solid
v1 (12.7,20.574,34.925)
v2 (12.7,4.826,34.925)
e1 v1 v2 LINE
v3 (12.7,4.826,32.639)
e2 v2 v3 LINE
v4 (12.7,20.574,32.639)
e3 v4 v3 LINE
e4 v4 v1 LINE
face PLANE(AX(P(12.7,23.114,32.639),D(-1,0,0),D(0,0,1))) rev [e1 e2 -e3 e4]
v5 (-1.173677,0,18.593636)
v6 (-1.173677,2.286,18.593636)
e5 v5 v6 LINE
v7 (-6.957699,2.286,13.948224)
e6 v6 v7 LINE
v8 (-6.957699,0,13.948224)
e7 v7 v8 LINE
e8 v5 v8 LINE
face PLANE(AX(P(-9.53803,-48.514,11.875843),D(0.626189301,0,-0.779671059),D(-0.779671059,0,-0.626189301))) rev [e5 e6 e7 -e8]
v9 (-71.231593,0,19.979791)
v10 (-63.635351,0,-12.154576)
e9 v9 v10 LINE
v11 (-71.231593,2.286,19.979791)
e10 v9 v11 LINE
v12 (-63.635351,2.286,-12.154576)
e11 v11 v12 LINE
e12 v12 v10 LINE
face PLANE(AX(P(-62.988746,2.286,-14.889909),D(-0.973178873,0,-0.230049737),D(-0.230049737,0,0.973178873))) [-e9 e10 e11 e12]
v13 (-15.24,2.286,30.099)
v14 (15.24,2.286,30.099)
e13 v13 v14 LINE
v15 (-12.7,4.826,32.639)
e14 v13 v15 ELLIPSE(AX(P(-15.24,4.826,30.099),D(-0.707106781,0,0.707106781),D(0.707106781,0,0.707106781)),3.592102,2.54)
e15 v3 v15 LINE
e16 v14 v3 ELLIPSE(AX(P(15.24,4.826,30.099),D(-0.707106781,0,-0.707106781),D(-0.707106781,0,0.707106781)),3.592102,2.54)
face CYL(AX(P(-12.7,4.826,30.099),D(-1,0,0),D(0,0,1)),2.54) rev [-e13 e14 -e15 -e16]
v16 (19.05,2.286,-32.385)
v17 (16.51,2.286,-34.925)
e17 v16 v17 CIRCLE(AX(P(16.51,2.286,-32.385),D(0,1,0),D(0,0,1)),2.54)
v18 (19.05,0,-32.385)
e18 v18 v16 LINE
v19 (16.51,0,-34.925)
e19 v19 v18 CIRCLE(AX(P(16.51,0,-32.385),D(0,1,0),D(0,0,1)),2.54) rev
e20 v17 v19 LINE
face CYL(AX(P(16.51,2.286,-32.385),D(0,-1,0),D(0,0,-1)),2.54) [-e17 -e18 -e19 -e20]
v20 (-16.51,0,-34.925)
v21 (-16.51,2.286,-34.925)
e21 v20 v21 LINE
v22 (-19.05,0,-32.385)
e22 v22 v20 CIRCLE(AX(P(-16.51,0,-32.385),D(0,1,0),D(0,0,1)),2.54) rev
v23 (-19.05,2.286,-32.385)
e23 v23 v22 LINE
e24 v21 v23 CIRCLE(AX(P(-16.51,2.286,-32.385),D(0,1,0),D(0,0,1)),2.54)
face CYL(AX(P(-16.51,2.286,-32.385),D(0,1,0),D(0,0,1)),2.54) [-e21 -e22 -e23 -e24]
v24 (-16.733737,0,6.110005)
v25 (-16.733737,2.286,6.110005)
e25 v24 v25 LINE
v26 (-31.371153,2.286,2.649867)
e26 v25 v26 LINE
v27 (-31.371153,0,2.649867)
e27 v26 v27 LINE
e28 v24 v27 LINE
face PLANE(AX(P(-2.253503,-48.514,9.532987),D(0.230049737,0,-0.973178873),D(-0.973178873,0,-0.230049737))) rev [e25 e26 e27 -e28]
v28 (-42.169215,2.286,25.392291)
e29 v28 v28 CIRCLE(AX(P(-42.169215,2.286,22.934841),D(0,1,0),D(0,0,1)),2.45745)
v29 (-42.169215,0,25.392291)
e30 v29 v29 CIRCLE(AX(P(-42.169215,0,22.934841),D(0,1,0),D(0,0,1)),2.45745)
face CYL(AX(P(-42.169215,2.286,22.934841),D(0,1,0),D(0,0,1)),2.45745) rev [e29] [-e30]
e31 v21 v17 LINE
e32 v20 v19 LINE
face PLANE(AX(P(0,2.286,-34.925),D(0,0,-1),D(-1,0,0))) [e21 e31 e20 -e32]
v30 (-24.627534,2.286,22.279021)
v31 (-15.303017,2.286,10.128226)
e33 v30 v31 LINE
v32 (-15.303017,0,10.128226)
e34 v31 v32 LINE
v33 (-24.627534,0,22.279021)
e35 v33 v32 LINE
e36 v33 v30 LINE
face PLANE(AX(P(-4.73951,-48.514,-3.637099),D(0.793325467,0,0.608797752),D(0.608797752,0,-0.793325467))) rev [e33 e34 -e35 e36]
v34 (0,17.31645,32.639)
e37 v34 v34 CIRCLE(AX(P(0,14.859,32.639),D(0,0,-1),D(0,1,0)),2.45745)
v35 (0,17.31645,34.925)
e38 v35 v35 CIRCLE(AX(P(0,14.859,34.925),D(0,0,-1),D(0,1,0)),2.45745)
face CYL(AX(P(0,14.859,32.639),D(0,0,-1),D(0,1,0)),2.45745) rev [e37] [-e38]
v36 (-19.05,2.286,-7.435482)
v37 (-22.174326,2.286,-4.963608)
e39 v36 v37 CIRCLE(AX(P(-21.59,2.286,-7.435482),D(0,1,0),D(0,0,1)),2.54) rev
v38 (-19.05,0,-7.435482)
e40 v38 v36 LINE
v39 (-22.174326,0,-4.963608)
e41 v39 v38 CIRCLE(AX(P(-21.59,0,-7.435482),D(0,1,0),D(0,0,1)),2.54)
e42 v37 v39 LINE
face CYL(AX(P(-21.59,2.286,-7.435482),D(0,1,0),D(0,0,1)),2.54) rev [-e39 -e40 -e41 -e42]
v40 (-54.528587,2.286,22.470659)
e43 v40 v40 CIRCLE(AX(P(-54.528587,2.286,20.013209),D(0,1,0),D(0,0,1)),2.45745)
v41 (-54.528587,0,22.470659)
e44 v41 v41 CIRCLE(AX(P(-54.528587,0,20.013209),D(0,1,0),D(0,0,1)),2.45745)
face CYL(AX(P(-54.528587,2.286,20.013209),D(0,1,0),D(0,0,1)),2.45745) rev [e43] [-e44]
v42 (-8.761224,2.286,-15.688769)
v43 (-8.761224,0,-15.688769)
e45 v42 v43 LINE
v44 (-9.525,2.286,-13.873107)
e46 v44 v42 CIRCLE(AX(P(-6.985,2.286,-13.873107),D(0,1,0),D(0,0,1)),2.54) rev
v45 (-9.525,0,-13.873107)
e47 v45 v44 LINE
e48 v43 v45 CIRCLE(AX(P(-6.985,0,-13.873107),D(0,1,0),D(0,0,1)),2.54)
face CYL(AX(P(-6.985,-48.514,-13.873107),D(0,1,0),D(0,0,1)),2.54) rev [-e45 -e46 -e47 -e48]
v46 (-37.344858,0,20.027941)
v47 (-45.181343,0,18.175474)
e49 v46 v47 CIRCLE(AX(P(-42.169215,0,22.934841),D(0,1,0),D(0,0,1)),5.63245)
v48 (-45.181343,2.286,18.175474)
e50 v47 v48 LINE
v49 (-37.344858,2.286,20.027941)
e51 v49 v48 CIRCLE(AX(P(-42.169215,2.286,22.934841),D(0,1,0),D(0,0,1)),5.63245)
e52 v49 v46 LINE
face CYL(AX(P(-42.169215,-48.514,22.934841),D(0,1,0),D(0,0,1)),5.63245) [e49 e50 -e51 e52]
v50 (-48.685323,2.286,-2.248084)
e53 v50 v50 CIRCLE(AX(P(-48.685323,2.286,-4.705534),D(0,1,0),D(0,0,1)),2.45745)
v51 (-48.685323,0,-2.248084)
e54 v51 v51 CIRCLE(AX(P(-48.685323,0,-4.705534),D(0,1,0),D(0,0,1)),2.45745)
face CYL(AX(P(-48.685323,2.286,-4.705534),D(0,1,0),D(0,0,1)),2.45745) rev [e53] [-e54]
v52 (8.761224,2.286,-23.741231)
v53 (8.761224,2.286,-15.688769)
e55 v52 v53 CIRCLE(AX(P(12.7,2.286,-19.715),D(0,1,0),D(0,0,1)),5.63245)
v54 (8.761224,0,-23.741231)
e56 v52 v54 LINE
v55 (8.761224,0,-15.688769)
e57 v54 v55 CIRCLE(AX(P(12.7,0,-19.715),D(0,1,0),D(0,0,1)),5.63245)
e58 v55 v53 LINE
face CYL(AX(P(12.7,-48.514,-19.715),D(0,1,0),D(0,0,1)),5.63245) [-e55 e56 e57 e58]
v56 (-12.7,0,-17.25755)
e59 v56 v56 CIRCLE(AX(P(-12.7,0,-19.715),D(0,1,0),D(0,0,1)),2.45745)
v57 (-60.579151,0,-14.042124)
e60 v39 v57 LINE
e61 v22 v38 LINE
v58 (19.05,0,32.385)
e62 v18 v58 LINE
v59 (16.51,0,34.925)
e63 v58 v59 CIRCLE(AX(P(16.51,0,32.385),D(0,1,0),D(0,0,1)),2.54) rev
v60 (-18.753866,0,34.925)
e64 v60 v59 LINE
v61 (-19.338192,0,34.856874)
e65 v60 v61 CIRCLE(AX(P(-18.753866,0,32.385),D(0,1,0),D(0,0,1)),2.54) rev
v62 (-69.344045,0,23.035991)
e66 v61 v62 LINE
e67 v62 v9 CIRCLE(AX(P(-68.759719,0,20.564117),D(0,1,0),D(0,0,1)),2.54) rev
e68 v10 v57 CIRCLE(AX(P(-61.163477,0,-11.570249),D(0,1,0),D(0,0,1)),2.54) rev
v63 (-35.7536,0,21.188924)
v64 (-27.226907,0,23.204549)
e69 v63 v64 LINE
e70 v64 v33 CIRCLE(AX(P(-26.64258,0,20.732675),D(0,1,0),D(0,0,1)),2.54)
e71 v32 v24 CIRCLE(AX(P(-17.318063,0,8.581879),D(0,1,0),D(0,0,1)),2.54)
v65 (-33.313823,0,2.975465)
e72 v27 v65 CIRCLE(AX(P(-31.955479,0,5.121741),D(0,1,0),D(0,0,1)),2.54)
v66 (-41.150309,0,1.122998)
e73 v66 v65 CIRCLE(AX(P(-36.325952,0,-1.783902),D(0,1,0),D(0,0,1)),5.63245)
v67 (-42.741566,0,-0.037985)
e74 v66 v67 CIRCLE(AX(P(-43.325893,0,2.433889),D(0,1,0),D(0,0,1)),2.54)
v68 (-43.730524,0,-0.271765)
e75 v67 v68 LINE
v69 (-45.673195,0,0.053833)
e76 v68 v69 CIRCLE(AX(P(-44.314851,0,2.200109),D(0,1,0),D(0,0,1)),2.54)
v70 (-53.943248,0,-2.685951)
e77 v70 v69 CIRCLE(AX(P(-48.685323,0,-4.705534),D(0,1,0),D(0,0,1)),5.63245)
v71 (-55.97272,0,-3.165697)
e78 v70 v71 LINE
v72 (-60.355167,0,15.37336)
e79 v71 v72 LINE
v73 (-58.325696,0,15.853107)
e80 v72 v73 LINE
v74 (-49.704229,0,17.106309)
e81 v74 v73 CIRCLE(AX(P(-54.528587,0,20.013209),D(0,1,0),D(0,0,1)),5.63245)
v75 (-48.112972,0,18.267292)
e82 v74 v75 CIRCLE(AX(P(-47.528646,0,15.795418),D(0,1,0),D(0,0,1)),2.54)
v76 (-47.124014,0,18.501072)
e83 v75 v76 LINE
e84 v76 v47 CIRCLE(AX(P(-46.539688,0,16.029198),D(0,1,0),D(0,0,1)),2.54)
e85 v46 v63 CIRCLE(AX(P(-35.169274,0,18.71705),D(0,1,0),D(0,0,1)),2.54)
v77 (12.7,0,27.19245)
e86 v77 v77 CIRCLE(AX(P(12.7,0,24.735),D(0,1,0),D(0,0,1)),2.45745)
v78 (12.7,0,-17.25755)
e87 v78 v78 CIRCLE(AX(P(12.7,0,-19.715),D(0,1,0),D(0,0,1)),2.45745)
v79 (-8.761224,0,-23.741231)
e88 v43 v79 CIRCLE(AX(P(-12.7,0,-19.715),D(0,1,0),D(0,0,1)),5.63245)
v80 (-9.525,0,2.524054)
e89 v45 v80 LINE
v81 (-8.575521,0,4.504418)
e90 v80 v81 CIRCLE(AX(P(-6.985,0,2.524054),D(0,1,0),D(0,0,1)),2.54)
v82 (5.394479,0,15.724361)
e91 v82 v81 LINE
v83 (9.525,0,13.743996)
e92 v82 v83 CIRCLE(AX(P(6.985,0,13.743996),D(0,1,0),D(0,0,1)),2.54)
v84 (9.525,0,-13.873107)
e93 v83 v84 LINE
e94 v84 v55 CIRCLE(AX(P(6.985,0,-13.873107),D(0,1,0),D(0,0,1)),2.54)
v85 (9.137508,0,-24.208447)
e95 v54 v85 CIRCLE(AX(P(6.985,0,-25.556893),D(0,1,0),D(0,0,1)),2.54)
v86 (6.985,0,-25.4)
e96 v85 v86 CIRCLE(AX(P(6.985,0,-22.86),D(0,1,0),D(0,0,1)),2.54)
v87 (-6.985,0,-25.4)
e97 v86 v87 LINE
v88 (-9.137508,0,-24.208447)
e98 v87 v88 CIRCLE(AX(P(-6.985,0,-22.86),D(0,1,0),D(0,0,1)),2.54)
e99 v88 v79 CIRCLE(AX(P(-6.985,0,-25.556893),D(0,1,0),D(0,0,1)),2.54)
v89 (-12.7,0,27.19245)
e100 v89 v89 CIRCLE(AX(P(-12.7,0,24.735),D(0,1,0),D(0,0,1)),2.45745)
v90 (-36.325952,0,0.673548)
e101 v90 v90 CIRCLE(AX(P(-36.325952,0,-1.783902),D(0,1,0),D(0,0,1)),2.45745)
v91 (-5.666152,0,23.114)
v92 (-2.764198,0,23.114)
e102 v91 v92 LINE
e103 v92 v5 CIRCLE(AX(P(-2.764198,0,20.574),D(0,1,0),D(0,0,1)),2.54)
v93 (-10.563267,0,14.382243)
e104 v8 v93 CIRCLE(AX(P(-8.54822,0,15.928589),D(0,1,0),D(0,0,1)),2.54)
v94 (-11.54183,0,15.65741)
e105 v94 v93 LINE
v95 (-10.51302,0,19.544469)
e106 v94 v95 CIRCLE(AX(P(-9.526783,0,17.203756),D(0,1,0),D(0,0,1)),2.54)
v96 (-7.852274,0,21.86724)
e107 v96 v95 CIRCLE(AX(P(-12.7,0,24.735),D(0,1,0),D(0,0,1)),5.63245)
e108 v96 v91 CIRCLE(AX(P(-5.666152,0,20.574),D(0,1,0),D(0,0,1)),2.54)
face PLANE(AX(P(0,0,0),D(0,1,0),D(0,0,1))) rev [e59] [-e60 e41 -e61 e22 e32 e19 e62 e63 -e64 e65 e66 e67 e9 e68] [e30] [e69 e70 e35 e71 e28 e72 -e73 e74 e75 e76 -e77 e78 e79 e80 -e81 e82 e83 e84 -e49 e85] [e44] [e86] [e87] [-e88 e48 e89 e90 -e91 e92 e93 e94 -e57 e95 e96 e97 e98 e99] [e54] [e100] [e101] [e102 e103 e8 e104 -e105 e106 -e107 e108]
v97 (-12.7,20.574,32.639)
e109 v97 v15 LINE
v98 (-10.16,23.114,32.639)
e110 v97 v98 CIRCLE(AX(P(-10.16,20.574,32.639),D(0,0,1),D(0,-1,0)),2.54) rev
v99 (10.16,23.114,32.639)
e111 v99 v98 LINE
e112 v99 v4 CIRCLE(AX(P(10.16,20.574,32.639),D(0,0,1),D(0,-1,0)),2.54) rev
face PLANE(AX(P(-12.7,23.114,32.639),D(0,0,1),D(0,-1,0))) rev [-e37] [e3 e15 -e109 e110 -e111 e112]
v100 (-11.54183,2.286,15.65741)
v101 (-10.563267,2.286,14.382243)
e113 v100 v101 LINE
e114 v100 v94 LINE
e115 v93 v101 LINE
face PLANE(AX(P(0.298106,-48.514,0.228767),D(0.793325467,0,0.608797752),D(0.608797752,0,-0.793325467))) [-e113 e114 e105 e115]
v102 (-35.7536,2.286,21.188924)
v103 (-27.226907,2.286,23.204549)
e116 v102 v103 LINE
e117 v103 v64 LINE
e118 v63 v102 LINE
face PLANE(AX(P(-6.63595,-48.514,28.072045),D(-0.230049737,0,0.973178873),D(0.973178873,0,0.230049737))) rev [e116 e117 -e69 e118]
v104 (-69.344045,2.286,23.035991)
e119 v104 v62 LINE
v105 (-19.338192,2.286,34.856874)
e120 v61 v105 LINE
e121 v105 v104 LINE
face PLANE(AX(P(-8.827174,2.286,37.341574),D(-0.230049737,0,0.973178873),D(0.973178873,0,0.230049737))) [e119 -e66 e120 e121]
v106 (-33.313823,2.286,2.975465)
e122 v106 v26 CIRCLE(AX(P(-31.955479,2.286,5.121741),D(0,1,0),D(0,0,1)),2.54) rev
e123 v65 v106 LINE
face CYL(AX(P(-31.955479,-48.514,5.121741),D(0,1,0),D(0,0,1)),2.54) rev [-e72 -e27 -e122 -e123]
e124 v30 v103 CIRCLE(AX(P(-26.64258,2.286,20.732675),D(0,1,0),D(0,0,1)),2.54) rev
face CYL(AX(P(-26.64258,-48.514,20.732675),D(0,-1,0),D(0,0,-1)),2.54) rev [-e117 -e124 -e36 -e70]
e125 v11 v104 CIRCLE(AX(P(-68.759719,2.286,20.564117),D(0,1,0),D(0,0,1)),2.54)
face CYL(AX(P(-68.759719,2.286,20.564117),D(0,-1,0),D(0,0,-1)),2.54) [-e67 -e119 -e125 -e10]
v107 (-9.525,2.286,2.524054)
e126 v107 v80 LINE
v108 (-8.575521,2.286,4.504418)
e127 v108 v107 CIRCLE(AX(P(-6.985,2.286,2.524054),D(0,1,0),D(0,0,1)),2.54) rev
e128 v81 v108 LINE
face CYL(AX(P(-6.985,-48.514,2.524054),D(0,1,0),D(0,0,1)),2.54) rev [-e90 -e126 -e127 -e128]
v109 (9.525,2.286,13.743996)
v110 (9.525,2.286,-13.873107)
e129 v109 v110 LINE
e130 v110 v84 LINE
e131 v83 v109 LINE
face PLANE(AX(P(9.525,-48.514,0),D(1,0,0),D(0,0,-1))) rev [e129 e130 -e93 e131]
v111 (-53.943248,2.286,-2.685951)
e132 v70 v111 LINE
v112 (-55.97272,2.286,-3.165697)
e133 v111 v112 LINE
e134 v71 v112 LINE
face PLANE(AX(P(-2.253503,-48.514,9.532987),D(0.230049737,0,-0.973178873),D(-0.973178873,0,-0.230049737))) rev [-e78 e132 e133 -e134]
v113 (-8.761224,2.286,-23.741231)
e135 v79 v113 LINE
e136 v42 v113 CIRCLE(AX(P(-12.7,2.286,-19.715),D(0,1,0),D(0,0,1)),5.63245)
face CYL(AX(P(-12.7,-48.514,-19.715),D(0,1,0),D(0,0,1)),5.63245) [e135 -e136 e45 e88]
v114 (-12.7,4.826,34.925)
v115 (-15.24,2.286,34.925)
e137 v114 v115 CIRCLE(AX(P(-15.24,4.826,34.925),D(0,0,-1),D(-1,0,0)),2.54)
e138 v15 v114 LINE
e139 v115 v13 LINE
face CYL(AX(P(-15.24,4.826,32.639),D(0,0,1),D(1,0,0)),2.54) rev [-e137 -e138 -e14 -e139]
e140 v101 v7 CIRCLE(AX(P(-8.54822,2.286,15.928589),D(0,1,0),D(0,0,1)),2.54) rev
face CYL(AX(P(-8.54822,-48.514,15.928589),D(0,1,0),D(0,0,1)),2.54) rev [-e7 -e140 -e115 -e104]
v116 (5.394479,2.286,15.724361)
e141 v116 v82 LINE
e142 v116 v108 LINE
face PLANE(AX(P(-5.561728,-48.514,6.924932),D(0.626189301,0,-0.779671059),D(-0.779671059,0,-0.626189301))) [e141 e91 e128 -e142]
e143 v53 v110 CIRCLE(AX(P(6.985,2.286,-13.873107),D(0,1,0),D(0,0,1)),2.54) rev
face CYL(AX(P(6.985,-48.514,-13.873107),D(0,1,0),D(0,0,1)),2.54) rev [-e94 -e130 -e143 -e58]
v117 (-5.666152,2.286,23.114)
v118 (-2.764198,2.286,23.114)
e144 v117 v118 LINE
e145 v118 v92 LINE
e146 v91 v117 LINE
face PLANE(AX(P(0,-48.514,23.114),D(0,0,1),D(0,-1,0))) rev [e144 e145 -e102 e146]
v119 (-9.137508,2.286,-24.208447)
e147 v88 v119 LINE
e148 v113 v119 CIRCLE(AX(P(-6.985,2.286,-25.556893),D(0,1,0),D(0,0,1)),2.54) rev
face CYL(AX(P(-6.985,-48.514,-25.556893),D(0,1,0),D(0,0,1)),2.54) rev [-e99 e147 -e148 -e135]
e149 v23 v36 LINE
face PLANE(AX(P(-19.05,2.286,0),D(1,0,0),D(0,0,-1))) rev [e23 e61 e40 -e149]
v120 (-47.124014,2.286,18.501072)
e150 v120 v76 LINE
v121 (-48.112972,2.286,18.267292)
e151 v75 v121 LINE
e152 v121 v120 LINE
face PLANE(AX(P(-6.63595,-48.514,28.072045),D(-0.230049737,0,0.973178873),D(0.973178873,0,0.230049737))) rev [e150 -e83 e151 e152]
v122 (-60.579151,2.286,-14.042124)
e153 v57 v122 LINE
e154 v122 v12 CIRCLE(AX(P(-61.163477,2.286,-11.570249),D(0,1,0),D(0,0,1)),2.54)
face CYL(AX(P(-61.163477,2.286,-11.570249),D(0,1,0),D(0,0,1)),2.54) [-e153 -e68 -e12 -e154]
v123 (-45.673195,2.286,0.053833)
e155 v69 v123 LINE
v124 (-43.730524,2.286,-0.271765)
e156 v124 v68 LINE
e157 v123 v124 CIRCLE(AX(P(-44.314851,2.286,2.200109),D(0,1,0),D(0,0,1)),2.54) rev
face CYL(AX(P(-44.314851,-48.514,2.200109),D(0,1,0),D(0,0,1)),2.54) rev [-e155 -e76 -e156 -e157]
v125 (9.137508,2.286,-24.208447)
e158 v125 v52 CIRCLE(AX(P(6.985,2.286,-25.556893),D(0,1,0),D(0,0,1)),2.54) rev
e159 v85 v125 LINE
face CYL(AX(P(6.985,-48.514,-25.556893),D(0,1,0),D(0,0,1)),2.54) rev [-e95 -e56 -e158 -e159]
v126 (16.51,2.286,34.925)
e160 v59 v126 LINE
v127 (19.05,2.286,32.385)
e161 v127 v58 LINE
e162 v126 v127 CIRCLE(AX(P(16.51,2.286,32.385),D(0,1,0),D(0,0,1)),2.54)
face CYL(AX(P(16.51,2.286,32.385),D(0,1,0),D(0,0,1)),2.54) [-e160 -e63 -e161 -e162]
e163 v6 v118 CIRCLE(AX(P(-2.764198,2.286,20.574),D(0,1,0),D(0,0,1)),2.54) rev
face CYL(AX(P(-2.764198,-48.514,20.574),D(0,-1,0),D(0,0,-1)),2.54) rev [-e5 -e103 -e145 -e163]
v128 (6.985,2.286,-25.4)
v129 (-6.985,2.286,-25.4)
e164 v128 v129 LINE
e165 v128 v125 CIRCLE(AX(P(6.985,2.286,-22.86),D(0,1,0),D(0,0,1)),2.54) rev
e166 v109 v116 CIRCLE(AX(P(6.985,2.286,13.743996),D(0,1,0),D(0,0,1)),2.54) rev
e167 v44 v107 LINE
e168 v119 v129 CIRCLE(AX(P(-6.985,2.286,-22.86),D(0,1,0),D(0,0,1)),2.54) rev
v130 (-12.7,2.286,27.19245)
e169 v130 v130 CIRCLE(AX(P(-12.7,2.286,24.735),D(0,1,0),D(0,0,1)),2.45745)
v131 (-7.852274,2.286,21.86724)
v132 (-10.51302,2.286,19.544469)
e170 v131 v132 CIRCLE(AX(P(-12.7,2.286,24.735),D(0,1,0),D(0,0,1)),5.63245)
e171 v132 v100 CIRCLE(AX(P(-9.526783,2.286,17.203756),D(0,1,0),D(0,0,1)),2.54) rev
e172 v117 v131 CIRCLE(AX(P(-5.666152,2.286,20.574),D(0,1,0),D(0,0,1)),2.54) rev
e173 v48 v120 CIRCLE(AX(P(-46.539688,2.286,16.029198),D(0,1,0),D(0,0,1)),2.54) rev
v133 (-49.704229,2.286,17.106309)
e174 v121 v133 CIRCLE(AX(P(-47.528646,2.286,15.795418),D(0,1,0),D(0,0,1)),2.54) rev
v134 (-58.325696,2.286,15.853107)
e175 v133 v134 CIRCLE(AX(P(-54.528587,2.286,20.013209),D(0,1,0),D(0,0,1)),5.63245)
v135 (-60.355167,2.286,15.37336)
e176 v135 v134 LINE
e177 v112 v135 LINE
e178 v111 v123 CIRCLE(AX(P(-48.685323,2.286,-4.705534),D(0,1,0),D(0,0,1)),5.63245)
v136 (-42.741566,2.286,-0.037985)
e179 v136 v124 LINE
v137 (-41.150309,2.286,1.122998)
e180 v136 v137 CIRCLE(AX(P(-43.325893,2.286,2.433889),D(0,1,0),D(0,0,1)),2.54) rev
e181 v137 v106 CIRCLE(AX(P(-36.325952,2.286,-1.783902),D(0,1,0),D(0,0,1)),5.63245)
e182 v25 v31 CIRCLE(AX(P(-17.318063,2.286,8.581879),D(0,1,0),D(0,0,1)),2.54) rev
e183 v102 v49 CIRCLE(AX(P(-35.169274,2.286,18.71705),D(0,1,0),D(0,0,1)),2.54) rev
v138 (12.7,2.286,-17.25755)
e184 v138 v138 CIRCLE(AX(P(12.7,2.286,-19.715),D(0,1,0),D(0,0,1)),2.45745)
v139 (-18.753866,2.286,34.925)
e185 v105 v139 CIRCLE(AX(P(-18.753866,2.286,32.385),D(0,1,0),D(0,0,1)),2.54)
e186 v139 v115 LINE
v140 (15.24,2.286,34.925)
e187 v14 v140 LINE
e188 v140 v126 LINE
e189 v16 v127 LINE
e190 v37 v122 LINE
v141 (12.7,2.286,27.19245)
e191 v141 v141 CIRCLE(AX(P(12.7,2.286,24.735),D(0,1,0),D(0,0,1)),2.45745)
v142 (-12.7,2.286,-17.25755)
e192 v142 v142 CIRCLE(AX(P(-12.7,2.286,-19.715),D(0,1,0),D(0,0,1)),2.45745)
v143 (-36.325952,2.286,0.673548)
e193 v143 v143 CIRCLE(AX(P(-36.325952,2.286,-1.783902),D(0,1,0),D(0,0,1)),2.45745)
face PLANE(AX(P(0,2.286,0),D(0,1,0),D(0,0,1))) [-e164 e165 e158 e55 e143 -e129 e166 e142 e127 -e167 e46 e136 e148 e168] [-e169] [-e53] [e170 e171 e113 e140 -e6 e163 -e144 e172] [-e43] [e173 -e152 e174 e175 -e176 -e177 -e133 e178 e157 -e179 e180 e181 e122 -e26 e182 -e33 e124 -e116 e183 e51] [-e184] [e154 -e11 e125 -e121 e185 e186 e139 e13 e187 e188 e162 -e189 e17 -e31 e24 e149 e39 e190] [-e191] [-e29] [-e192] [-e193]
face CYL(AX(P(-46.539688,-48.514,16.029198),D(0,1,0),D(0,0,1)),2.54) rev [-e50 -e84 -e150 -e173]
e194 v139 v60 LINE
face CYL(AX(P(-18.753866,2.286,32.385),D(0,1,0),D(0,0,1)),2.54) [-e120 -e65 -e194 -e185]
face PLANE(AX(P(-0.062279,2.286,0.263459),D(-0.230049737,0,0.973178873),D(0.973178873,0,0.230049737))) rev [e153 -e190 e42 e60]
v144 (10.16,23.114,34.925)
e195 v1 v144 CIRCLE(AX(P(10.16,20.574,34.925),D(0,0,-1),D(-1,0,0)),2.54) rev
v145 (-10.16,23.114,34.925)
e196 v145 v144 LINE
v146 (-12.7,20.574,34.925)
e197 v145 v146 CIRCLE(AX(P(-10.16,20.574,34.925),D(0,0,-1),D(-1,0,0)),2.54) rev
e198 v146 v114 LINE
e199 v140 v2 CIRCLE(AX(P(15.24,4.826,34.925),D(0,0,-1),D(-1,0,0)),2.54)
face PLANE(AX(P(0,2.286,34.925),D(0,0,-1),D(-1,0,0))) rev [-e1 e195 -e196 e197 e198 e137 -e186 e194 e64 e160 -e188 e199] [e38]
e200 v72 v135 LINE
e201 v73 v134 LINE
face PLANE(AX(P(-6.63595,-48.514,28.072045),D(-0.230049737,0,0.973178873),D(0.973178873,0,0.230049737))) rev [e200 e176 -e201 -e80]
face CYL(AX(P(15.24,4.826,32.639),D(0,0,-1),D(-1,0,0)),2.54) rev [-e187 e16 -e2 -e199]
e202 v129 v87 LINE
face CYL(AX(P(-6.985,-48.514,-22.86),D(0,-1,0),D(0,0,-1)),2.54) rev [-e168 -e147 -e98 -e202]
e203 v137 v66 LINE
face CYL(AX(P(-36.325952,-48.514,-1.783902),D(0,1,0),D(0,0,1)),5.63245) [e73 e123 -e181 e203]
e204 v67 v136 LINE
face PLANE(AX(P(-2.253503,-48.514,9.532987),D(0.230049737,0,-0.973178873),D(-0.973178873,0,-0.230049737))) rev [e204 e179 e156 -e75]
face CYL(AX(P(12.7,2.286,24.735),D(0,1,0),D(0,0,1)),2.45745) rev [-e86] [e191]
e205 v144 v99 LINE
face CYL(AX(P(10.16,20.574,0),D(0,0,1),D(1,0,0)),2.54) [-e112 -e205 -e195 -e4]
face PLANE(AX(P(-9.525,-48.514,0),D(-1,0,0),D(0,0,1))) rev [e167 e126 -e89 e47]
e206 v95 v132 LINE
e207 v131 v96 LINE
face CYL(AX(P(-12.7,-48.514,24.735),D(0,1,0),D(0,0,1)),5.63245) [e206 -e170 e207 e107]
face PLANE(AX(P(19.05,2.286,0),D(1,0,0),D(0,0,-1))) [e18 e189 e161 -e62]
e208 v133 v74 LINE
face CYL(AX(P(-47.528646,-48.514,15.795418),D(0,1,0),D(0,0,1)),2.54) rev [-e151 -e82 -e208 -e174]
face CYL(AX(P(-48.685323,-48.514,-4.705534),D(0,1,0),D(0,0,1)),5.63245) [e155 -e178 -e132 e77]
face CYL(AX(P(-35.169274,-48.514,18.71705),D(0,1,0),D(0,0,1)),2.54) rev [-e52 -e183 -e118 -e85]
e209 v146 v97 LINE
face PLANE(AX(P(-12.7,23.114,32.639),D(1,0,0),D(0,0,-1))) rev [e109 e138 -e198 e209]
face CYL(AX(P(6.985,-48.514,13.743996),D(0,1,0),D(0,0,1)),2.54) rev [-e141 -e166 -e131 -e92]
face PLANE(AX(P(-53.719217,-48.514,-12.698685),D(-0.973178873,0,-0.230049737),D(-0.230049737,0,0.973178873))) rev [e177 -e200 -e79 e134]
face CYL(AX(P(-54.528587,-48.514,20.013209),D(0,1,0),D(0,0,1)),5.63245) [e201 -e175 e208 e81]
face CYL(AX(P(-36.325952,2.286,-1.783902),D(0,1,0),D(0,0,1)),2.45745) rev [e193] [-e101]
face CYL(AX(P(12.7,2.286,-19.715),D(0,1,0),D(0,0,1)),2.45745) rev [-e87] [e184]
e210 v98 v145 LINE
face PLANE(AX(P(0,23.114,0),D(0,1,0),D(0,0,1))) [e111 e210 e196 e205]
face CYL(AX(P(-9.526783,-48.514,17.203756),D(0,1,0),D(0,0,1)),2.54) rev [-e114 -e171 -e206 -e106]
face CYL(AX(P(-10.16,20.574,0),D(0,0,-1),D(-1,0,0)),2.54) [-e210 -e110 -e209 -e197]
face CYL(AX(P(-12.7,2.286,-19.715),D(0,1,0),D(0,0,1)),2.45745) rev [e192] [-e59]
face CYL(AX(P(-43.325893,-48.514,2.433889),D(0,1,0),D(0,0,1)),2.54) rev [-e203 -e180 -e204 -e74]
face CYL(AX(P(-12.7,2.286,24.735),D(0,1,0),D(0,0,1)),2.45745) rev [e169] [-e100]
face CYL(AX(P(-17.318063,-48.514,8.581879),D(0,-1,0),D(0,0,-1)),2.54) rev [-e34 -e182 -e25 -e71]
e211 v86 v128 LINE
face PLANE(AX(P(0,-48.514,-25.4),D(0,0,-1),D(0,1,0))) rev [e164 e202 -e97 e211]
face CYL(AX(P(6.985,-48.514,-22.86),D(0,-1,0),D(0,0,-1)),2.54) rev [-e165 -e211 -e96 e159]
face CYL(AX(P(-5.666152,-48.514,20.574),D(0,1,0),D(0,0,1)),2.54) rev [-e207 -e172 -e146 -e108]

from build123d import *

# Parameters (mm, degrees)
BOSS_EXTRUDE1_DEPTH          = 2.286
SKETCH2_W                    = 25.4
SKETCH2_H                    = 2.286
BOSS_EXTRUDE2_DEPTH          = 20.828
F_10_0_1935_DIAMETER_HOLE1_D = 4.9149
F_10_0_1935_DIAMETER_HOLE2_D = 4.9149
F_10_0_1935_DIAMETER_HOLE3_D = 4.9149
CUT_EXTRUDE1_DEPTH           = 50.8
FILLET1_R                    = 2.54
FILLET2_R                    = 2.54


with BuildPart() as part:
    # Sketch1 → Boss-Extrude1 (new body)
    with BuildSketch(Plane(origin=(0, 0, 0), x_dir=(1, 0, 0), z_dir=(0, 1, 0))):
        Polygon((19.05, 34.925), (-19.05, 34.925), (-19.05, 4.22504843), (-63.051024839, 14.626449943), (-71.815919826, -22.451665109), (-19.05, -34.925), (19.05, -34.925), align=None)
    extrude(amount=BOSS_EXTRUDE1_DEPTH)

    # Sketch2 → Boss-Extrude2 (add)
    with BuildSketch(Plane(origin=(0, 2.286, 0), x_dir=(1, 0, 0), z_dir=(0, 1, 0))):
        with Locations((0, -33.782)):
            Rectangle(SKETCH2_W, SKETCH2_H)
    extrude(amount=BOSS_EXTRUDE2_DEPTH)

    # #10 (0.1935) Diameter Hole1 (through all)
    with Locations(Plane(origin=(0, 2.286, 0), x_dir=(1, 0, 0), z_dir=(0, 1, 0))):
        with Locations((-12.7, -24.735), (12.7, -24.735), (-12.7, 19.715), (12.7, 19.715)):
            Hole(F_10_0_1935_DIAMETER_HOLE1_D / 2)

    # #10 (0.1935) Diameter Hole2 (through all)
    with Locations(Plane(origin=(0, 0, 32.639), x_dir=(-1, 0, 0), z_dir=(0, 0, -1))):
        with Locations((0, 14.859)):
            Hole(F_10_0_1935_DIAMETER_HOLE2_D / 2)

    # #10 (0.1935) Diameter Hole3 (through all)
    with Locations(Plane(origin=(0, 2.286, 0), x_dir=(1, 0, 0), z_dir=(0, 1, 0))):
        with Locations((-48.685323349, 4.705533941), (-36.325951665, 1.783902278), (-54.528586674, -20.013209428), (-42.169214989, -22.93484109)):
            Hole(F_10_0_1935_DIAMETER_HOLE3_D / 2)

    # Sketch10 → Cut-Extrude1 (cut)
    with BuildSketch(Plane(origin=(0, 2.286, 0), x_dir=(1, 0, 0), z_dir=(0, 1, 0))):
        with BuildLine():
            Line((-9.525, -3.741848106), (9.525, -19.04176984))
            Line((9.525, -19.04176984), (9.525, 15.062702933))
            ThreePointArc((9.525, 15.062702933), (7.06755, 19.715), (9.525, 24.367297067))
            Line((9.525, 24.367297067), (9.525, 25.4))
            Line((9.525, 25.4), (-9.525, 25.4))
            Line((-9.525, 25.4), (-9.525, 24.367297067))
            ThreePointArc((-9.525, 24.367297067), (-7.06755, 19.715), (-9.525, 15.062702933))
            Line((-9.525, 15.062702933), (-9.525, -3.741848106))
        make_face()
        with BuildLine():
            Line((-7.305850206, -23.114), (4.454648276, -23.114))
            Line((4.454648276, -23.114), (-8.982344597, -12.322139669))
            Line((-8.982344597, -12.322139669), (-14.383129392, -19.359912238))
            ThreePointArc((-14.383129392, -19.359912238), (-10.060641775, -19.759230596), (-7.305850206, -23.114))
        make_face()
        with BuildLine():
            Line((-25.627859788, -23.582547729), (-12.912609208, -7.013281383))
            Line((-12.912609208, -7.013281383), (-32.528842365, -2.37620036))
            ThreePointArc((-32.528842365, -2.37620036), (-37.621695307, -3.697479064), (-41.583876796, -0.235680925))
            Line((-41.583876796, -0.235680925), (-44.888214049, 0.545431302))
            ThreePointArc((-44.888214049, 0.545431302), (-49.981066991, -0.775847401), (-53.94324848, 2.685950737))
            Line((-53.94324848, 2.685950737), (-55.972719823, 3.165697433))
            Line((-55.972719823, 3.165697433), (-60.355167316, -15.373360093))
            Line((-60.355167316, -15.373360093), (-58.325695974, -15.853106789))
            ThreePointArc((-58.325695974, -15.853106789), (-53.232843031, -14.531828086), (-49.270661542, -17.993626224))
            Line((-49.270661542, -17.993626224), (-45.96632429, -18.774738451))
            ThreePointArc((-45.96632429, -18.774738451), (-40.873471347, -17.453459748), (-36.911289858, -20.915257887))
            Line((-36.911289858, -20.915257887), (-25.627859788, -23.582547729))
        make_face()
    extrude(amount=-CUT_EXTRUDE1_DEPTH, mode=Mode.SUBTRACT)

    # Fillet1
    # the kernel refuses this fillet: 2.54 mm, written as the material it adds along each edge
    with BuildSketch(Plane(origin=(-19.05, 0, -4.22504843), x_dir=(0, 0, -1), z_dir=(0, 1, 0))) as fillet1_piece_1:
        with BuildLine():
            CenterArc((FILLET1_R * 1.26395030924, FILLET1_R), FILLET1_R, 166.7, 103.3)
            Line((FILLET1_R * 0.290771436458, FILLET1_R * 1.23004973719), (0, 0))
            Line((0, 0), (FILLET1_R * 1.26395030924, 0))
        make_face()
    extrude(amount=2.286)
    with BuildSketch(Plane(origin=(9.525, 2.286, -24.367297067), x_dir=(-0.773382110639457, 0, 0.6339401477607004), z_dir=(0, -1, 0)), Plane(origin=(-41.583876796, 2.286, 0.235680925), x_dir=(0.4390208071072497, 0, 0.8984768950434391), z_dir=(0, -1, 0)), Plane(origin=(-36.911289858, 2.286, 20.915257887), x_dir=(-0.43902080710723695, 0, -0.8984768950434453), z_dir=(0, -1, 0))) as fillet1_piece_2:
        with BuildLine():
            CenterArc((1.21025793, 2.5302202), FILLET1_R, 219.341421459, 45.629074101)
            Line((-0.754132631, 0.920012225), (0, 0))
            ThreePointArc((0, 0), (0.493789689, 0.021686706), (0.987579378, 0))
        make_face()
    extrude(amount=2.286)
    with BuildSketch(Plane(origin=(9.525, 2.286, -15.062702933), x_dir=(0, 0, 1), z_dir=(0, -1, 0)), Plane(origin=(-9.525, 2.286, -24.367297067), x_dir=(0, 0, -1), z_dir=(0, -1, 0)), Plane(origin=(-32.528842365, 2.286, 2.37620036), x_dir=(0.9731788727770777, 0, 0.23004973718814892), z_dir=(0, -1, 0)), Plane(origin=(-45.96632429, 2.286, 18.774738451), x_dir=(-0.9731788727770783, 0, -0.23004973718814611), z_dir=(0, -1, 0)), Plane(origin=(-44.888214049, 2.286, -0.545431302), x_dir=(0.9731788727770778, 0, 0.2300497371881489), z_dir=(0, -1, 0))) as fillet1_piece_3:
        with BuildLine():
            CenterArc((1.189595948, 2.54), FILLET1_R, 224.370925899, 45.629074101)
            ThreePointArc((-0.626066217, 0.763776224), (-0.296260998, 0.395636185), (0, 0))
            Line((0, 0), (1.189595948, 0))
        make_face()
    extrude(amount=2.286)
    with BuildSketch(Plane(origin=(9.525, 2.286, 19.04176984), x_dir=(-0.7796710587119345, 0, -0.6261893006168431), z_dir=(0, -1, 0))) as fillet1_piece_4:
        with BuildLine():
            CenterArc((FILLET1_R * 2.08573767417, FILLET1_R), FILLET1_R, 141.230467708, 128.769532292)
            Line((FILLET1_R * 1.30606661546, FILLET1_R * 1.62618930062), (0, 0))
            Line((0, 0), (FILLET1_R * 2.08573767417, 0))
        make_face()
    extrude(amount=2.286)
    with BuildSketch(Plane(origin=(-9.525, 2.286, 3.741848106), x_dir=(0, 0, -1), z_dir=(0, -1, 0))) as fillet1_piece_5:
        with BuildLine():
            CenterArc((FILLET1_R * 0.47944667845, FILLET1_R), FILLET1_R, 218.769532292, 51.230467708)
            Line((-FILLET1_R * 0.300224380262, FILLET1_R * 0.373810699383), (0, 0))
            Line((0, 0), (FILLET1_R * 0.47944667845, 0))
        make_face()
    extrude(amount=2.286)
    with BuildSketch(Plane(origin=(-9.525, 2.286, -15.062702933), x_dir=(0, 0, 1), z_dir=(0, -1, 0)), Plane(origin=(-49.270661542, 2.286, 17.993626224), x_dir=(0.9731788727770844, 0, 0.23004973718812088), z_dir=(0, -1, 0))) as fillet1_piece_6:
        with BuildLine():
            CenterArc((1.189595948, -2.54), FILLET1_R, 90, 45.629074101)
            ThreePointArc((-0.626066217, -0.763776224), (-0.296260998, -0.395636185), (0, 0))
            Line((0, 0), (1.189595948, 0))
        make_face()
    extrude(amount=2.286)
    with BuildSketch(Plane(origin=(-9.525, 2.286, -25.4), x_dir=(1, 0, 0), z_dir=(0, -1, 0)), Plane(origin=(9.525, 2.286, -25.4), x_dir=(0, 0, 1), z_dir=(0, -1, 0))) as fillet1_piece_7:
        with BuildLine():
            CenterArc((FILLET1_R, FILLET1_R), FILLET1_R, 180, 90)
            Line((0, FILLET1_R), (0, 0))
            Line((0, 0), (FILLET1_R, 0))
        make_face()
    extrude(amount=2.286)
    with BuildSketch(Plane(origin=(-7.305850206, 2.286, 23.114), x_dir=(1, 0, 0), z_dir=(0, -1, 0))) as fillet1_piece_8:
        with BuildLine():
            CenterArc((1.639698228, -2.54), FILLET1_R, 90, 59.392795524)
            ThreePointArc((-0.546423923, -1.246759907), (-0.235408974, -0.639948065), (0, 0))
            Line((0, 0), (1.639698228, 0))
        make_face()
    extrude(amount=2.286)
    with BuildSketch(Plane(origin=(-14.383129392, 2.286, 19.359912238), x_dir=(0.6087977522043749, 0, -0.7933254672017661), z_dir=(0, -1, 0))) as fillet1_piece_9:
        with BuildLine():
            CenterArc((4.66706616, 2.54), FILLET1_R, 165.34503033, 104.65496967)
            ThreePointArc((2.209700261, 3.182614066), (1.387122014, 1.395324661), (0, 0))
            Line((0, 0), (4.66706616, 0))
        make_face()
    extrude(amount=2.286)
    with BuildSketch(Plane(origin=(-8.982344597, 2.286, 12.322139669), x_dir=(0.7796710587119348, 0, 0.6261893006168427), z_dir=(0, -1, 0))) as fillet1_piece_10:
        with BuildLine():
            CenterArc((FILLET1_R * 1.02235985184, FILLET1_R), FILLET1_R, 178.733091006, 91.266908994)
            Line((FILLET1_R * 0.0226043062578, FILLET1_R * 1.02210993147), (0, 0))
            Line((0, 0), (FILLET1_R * 1.02235985184, 0))
        make_face()
    extrude(amount=2.286)
    with BuildSketch(Plane(origin=(4.454648276, 2.286, 23.114), x_dir=(-1, 0, 0), z_dir=(0, -1, 0))) as fillet1_piece_11:
        with BuildLine():
            CenterArc((FILLET1_R * 2.84206558138, FILLET1_R), FILLET1_R, 128.769532292, 141.230467708)
            Line((FILLET1_R * 2.21587628076, FILLET1_R * 1.77967105871), (0, 0))
            Line((0, 0), (FILLET1_R * 2.84206558138, 0))
        make_face()
    extrude(amount=2.286)
    with BuildSketch(Plane(origin=(-12.912609208, 2.286, 7.013281383), x_dir=(-0.6087977522043783, 0, 0.7933254672017636), z_dir=(0, -1, 0))) as fillet1_piece_12:
        with BuildLine():
            CenterArc((FILLET1_R * 1.54584224651, FILLET1_R), FILLET1_R, 155.797376702, 114.202623298)
            Line((FILLET1_R * 0.633740899703, FILLET1_R * 1.40996479501), (0, 0))
            Line((0, 0), (FILLET1_R * 1.54584224651, 0))
        make_face()
    extrude(amount=2.286)
    with BuildSketch(Plane(origin=(-25.627859788, 2.286, 23.582547729), x_dir=(-0.9731788727770897, 0, -0.2300497371880981), z_dir=(0, -1, 0))) as fillet1_piece_13:
        with BuildLine():
            CenterArc((FILLET1_R * 0.646896539576, FILLET1_R), FILLET1_R, 204.202623298, 65.797376702)
            Line((-FILLET1_R * 0.265204807237, FILLET1_R * 0.590035204995), (0, 0))
            Line((0, 0), (FILLET1_R * 0.646896539576, 0))
        make_face()
    extrude(amount=2.286)
    # the kernel refuses this fillet: 2.54 mm, written as the material it takes off along each edge
    with BuildSketch(Plane(origin=(-63.051024839, -6.35, -14.626449943), x_dir=(-0.23004973718809857, 0, 0.9731788727770896), z_dir=(0, 1, 0)), Plane(origin=(19.05, -6.35, -34.925), x_dir=(-1, 0, 0), z_dir=(0, 1, 0)), Plane(origin=(19.05, -6.35, 34.925), x_dir=(0, 0, -1), z_dir=(0, 1, 0)), Plane(origin=(-71.815919826, -6.35, 22.451665109), x_dir=(0.9731788727770898, 0, 0.23004973718809796), z_dir=(0, 1, 0))) as fillet1_2_piece_1:
        with BuildLine():
            CenterArc((FILLET1_R, FILLET1_R), FILLET1_R, 180, 90)
            Line((0, FILLET1_R), (0, 0))
            Line((0, 0), (FILLET1_R, 0))
        make_face()
    extrude(amount=14.986, mode=Mode.SUBTRACT)
    with BuildSketch(Plane(origin=(-19.05, -6.35, -34.925), x_dir=(1, 0, 0), z_dir=(0, 1, 0))) as fillet1_2_piece_2:
        with BuildLine():
            CenterArc((FILLET1_R, -FILLET1_R), FILLET1_R, 90, 90)
            Line((0, -FILLET1_R), (0, 0))
            Line((0, 0), (FILLET1_R, 0))
        make_face()
    extrude(amount=14.986, mode=Mode.SUBTRACT)
    with BuildSketch(Plane(origin=(-19.05, -0.740336242, 34.925), x_dir=(1, 0, 0), z_dir=(0, 1, 0))) as fillet1_2_piece_3:
        with BuildLine():
            CenterArc((FILLET1_R * 0.116588384541, FILLET1_R), FILLET1_R, 256.7, 13.3)
            Line((-FILLET1_R * 0.113461352647, FILLET1_R * 0.0268211272229), (0, 0))
            Line((0, 0), (FILLET1_R * 0.116588384541, 0))
        make_face()
    extrude(amount=3.766672484, mode=Mode.SUBTRACT)

    # Fillet2
    fillet2_edges = [part.edges().sort_by_distance(p)[0] for p in [
        (12.7, 2.286, 33.782),
        (0, 2.286, 32.639),
        (-12.7, 2.286, 33.782),
        (12.7, 23.114, 33.782),
        (-12.7, 23.114, 33.782),
    ]]
    fillet(fillet2_edges, radius=FILLET2_R)


solid = part.part
